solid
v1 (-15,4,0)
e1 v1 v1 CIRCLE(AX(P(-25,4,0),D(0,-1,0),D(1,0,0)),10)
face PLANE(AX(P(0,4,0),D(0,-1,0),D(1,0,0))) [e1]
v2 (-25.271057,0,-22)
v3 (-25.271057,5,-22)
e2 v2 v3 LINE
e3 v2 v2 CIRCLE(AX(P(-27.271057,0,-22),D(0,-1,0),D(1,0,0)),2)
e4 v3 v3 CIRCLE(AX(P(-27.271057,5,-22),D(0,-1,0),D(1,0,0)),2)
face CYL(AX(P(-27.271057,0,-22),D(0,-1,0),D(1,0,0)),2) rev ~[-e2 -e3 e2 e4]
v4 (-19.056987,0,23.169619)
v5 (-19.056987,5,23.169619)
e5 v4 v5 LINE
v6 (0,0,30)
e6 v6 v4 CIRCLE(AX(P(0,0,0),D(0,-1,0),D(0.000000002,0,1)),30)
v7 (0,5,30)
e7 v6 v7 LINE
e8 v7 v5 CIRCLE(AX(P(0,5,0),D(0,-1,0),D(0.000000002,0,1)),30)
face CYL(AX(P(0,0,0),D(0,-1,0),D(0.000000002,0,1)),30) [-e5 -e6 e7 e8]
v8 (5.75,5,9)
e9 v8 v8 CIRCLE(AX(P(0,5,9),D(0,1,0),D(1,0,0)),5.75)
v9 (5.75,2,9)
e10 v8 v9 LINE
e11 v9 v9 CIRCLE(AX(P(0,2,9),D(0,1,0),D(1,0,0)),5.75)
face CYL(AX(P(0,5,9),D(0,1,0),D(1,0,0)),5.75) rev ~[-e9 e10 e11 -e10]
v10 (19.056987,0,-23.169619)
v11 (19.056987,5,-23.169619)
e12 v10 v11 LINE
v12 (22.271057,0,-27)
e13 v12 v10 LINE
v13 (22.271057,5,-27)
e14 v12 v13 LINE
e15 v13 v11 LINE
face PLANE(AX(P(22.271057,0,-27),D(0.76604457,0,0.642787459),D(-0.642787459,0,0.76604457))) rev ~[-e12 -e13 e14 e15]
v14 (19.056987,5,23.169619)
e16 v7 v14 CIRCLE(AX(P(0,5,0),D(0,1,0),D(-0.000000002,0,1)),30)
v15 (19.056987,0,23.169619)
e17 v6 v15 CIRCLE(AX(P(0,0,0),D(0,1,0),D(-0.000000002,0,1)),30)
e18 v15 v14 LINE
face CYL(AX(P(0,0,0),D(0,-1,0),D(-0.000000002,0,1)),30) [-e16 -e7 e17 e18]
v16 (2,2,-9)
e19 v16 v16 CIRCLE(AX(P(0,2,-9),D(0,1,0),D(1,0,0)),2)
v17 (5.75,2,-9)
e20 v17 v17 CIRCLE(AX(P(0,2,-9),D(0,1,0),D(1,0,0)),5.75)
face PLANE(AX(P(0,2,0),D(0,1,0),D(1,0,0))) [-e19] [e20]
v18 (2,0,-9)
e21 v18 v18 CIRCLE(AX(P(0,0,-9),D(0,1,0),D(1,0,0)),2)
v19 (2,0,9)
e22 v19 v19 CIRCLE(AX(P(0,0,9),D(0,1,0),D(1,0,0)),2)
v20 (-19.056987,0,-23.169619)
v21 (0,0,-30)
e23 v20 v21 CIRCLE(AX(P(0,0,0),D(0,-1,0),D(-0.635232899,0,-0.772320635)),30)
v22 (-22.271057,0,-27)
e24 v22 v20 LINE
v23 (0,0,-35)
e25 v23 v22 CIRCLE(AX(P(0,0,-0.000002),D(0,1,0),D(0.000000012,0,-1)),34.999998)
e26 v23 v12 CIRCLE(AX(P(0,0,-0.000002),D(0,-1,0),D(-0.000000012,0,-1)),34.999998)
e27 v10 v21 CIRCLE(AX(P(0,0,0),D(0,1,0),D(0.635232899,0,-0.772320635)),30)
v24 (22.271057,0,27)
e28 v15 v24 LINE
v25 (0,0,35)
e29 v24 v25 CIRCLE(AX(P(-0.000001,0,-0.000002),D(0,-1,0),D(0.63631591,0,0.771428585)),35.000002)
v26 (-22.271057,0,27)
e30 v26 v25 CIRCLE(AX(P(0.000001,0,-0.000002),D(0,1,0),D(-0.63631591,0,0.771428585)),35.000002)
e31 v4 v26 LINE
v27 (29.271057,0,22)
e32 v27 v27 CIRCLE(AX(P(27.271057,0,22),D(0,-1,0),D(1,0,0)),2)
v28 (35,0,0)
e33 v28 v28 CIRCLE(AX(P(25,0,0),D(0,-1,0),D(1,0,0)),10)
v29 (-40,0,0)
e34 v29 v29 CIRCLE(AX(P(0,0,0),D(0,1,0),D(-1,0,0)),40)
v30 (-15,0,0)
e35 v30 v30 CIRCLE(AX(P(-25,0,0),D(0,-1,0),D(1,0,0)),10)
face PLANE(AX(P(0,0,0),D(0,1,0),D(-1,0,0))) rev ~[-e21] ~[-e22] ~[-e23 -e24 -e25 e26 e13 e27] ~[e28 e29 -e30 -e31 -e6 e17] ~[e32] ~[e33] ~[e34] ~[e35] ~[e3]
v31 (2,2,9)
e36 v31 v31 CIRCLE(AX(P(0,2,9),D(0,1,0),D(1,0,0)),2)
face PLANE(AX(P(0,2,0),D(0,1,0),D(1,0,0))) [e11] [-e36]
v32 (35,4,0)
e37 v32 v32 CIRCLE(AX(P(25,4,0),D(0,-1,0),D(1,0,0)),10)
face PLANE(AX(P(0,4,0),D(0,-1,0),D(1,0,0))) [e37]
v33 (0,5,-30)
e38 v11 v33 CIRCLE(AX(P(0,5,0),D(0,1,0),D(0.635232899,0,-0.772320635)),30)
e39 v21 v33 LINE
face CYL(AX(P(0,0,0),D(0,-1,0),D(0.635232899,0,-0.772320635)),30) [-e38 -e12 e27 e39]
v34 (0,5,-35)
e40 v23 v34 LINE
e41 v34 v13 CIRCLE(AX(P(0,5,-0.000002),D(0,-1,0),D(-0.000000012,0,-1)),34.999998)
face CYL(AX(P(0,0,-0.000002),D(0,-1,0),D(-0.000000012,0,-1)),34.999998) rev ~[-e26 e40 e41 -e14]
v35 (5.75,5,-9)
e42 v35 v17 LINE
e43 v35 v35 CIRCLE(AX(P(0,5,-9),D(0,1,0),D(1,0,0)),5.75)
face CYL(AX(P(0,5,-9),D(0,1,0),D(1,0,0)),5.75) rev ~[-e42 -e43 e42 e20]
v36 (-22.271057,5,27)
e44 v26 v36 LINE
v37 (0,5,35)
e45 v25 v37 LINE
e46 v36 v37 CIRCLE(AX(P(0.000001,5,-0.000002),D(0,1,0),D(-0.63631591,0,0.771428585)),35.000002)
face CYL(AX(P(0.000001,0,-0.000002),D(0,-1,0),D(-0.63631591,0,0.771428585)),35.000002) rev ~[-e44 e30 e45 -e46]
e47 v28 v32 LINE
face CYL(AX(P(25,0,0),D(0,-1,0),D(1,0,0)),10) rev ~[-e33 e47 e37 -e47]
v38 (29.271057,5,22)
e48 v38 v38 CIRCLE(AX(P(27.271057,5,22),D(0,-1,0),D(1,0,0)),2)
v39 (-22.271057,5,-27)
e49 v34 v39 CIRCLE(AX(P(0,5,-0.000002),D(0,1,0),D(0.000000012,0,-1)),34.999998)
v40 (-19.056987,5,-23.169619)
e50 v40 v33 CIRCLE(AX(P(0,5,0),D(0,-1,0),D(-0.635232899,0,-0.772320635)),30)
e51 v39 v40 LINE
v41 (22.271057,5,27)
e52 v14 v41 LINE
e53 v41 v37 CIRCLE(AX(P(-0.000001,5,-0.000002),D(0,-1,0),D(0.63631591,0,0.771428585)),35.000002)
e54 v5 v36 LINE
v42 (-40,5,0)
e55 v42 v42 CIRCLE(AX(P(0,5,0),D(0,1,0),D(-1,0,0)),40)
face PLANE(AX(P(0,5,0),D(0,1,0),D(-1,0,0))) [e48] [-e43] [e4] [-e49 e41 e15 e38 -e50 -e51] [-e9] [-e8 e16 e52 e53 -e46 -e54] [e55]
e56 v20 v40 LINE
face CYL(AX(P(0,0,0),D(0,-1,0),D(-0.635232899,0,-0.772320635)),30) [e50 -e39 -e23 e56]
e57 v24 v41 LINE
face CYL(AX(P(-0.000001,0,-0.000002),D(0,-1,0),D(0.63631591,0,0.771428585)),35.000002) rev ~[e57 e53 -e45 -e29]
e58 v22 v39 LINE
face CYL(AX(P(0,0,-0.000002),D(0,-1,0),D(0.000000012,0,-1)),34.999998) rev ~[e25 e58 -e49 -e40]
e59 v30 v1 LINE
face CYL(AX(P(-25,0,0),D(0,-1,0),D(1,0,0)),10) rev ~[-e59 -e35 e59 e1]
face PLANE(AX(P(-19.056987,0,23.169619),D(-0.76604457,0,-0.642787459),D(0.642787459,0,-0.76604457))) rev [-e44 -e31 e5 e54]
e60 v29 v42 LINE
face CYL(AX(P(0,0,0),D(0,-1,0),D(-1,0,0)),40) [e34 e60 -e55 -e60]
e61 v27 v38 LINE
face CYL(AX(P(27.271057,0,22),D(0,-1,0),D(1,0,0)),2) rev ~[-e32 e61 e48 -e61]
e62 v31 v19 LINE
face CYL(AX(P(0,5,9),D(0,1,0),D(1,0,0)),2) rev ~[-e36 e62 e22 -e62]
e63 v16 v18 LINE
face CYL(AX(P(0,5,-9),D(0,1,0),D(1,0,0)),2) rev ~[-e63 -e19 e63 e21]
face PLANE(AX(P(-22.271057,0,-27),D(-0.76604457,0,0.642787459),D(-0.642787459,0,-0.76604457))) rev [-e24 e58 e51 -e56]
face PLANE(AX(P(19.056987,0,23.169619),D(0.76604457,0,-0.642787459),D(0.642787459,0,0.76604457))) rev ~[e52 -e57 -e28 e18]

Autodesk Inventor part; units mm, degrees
ref_plane "YZ Plane" through (0, 0, 0) normal (1, 0, 0) x (0, 1, 0)
ref_plane "XZ Plane" through (0, 0, 0) normal (0, 1, 0) x (-1, 0, 0)
sketch "Sketch1" plane through (0, 0, 0) normal (0, 1, 0) x (-1, 0, 0)
  circle A0 centre (0, 0) radius 40
  dimension "d0" = 80
sketch "Sketch1 outline for Extrusion1" plane through (0, 0, 0) normal (0, 1, 0) x (-1, 0, 0)
  circle A0 centre (0, 0) radius 40
extrude "Extrusion1" add sketch "Sketch1 outline for Extrusion1" along normal blind 5
sketch "Sketch3" plane through (0, 5, 0) normal (0, 1, 0) x (1, 0, 0)
  line L0 (0, 0) -> (-5, 0)
  line L1 (0, 0) -> (5, 0)
  line L2 (0, 0) -> (0, -9)
  line L3 (0, 0) -> (0, 9)
  circle A0 centre (0, 9) radius 2
  circle A1 centre (0, -9) radius 2
  dimension "d63" = 9
  dimension "d64" = 9
  dimension "d65" = 4
  dimension "d66" = 4
sketch "Sketch3 outline for Extrusion3" plane through (0, 5, 0) normal (0, 1, 0) x (1, 0, 0)
  circle A0 centre (0, 9) radius 2
  circle A1 centre (0, -9) radius 2
extrude "Extrusion3" cut sketch "Sketch3 outline for Extrusion3" against normal up to surface (5 mm away)
sketch "Sketch6" plane through (0, 0, 0) normal (0, -1, 0) x (1, 0, 0)
  line L0 (0, 0) -> (-25, 0)
  line L1 (0, 0) -> (25, 0)
  circle A0 centre (25, 0) radius 10
  circle A1 centre (-25, 0) radius 10
  dimension "d18" = 25
  dimension "d19" = 25
  dimension "d20" = 20
  dimension "d21" = 20
sketch "Sketch6 outline for Extrusion5" plane through (0, 0, 0) normal (0, -1, 0) x (1, 0, 0)
  circle A0 centre (25, 0) radius 10
  circle A1 centre (-25, 0) radius 10
extrude "Extrusion5" cut sketch "Sketch6 outline for Extrusion5" against normal blind 4
sketch "Sketch8" plane through (0, 0, 0) normal (0, -1, 0) x (1, 0, 0)
  circle A0 centre (0, 0) radius 40
  line L0 (0, 40) -> (0, 35)
  line L1 (0, 35) -> (0, 30)
  line L2 (0, 30) -> (0, 27)
  circle A1 centre (0, 0) radius 35
  circle A2 centre (0, 0) radius 30
  line L3 (0, 27) -> (30, 27)
  line L4 (22.271057, 27) -> (19.056987, 23.169619)
  line L5 (22.271057, 27) -> (27.271264, 27) construction
  line L6 (-40, 0) -> (40, 0)
  line L7 (22.271057, -27) -> (19.056987, -23.169619)
  line L8 (0, -40) -> (0, -30)
  point P0 (0, -35)
  dimension "d46" = 5
  dimension "d47" = 5
  dimension "d48" = 3
  dimension "d49" = 130
sketch "Sketch8 outline for Extrusion7" plane through (0, 0, 0) normal (0, -1, 0) x (1, 0, 0)
  line L0 (0, -30) -> (0, -35)
  arc A0 (19.056987, -23.169619) -> (0, -30) centre (0, 0) cw
  line L1 (22.271057, -27) -> (19.056987, -23.169619)
  arc A1 (0, -35) -> (22.271057, -27) centre (0, 0) ccw
  arc A2 (22.271057, 27) -> (0, 35) centre (0, 0) ccw
  line L2 (19.056987, 23.169619) -> (22.271057, 27)
  arc A3 (0, 30) -> (19.056987, 23.169619) centre (0, 0) cw
  line L3 (0, 35) -> (0, 30)
extrude "Extrusion7" cut sketch "Sketch8 outline for Extrusion7" against normal up to surface (5 mm away)
ref_plane "Work Plane1" through (0, 0, 32.5) normal (1, 0, 0) x (0, 0, -1)
mirror "Mirror1" about plane through (0, 0, 32.5) normal (1, 0, 0) of "Extrusion7"
sketch "Sketch11" plane through (0, 5, 0) normal (0, 1, 0) x (1, 0, 0)
  circle A0 centre (0, -9) radius 2 projected
  circle A1 centre (0, -9) radius 5.75
  circle A2 centre (0, 9) radius 2 projected
  circle A3 centre (0, 9) radius 5.75
  point P0 (0, 0)
  dimension "d67" = 11.5
  dimension "d68" = 11.5
sketch "Sketch11 outline for Extrusion10" plane through (0, 5, 0) normal (0, 1, 0) x (1, 0, 0)
  circle A0 centre (0, 9) radius 5.75
  circle A1 centre (0, 9) radius 2
  circle A2 centre (0, -9) radius 5.75
  circle A3 centre (0, -9) radius 2
extrude "Extrusion10" cut sketch "Sketch11 outline for Extrusion10" against normal blind 3
sketch "Sketch12" plane through (0, 0, 0) normal (0, -1, 0) x (1, 0, 0)
  circle A0 centre (0, 0) radius 40
  line L0 (0, -40) -> (0, -35)
  arc A1 (-22.271057, -27) -> (22.271057, -27) centre (0, 0) ccw
  arc A2 (-19.056987, -23.169619) -> (19.056987, -23.169619) centre (0, 0) ccw
  circle A3 centre (-25, 0) radius 10
  line L1 (22.271057, 27) -> (22.271057, 22)
  line L2 (22.271057, 22) -> (27.271057, 22)
  circle A4 centre (27.271057, 22) radius 2
  line L3 (-22.271057, -27) -> (-22.271057, -22)
  line L4 (-22.271057, -22) -> (-27.271057, -22)
  circle A5 centre (-27.271057, -22) radius 2
  dimension "d71" = 5
  dimension "d72" = 5
  dimension "d73" = 4
  dimension "d74" = 5
  dimension "d75" = 5
  dimension "d76" = 4
sketch "Sketch12 outline for Extrusion11" plane through (0, 0, 0) normal (0, -1, 0) x (1, 0, 0)
  circle A0 centre (-27.271057, -22) radius 2
  circle A1 centre (27.271057, 22) radius 2
extrude "Extrusion11" cut sketch "Sketch12 outline for Extrusion11" against normal up to surface (5 mm away)
properties part number "Wrist_Arm"
